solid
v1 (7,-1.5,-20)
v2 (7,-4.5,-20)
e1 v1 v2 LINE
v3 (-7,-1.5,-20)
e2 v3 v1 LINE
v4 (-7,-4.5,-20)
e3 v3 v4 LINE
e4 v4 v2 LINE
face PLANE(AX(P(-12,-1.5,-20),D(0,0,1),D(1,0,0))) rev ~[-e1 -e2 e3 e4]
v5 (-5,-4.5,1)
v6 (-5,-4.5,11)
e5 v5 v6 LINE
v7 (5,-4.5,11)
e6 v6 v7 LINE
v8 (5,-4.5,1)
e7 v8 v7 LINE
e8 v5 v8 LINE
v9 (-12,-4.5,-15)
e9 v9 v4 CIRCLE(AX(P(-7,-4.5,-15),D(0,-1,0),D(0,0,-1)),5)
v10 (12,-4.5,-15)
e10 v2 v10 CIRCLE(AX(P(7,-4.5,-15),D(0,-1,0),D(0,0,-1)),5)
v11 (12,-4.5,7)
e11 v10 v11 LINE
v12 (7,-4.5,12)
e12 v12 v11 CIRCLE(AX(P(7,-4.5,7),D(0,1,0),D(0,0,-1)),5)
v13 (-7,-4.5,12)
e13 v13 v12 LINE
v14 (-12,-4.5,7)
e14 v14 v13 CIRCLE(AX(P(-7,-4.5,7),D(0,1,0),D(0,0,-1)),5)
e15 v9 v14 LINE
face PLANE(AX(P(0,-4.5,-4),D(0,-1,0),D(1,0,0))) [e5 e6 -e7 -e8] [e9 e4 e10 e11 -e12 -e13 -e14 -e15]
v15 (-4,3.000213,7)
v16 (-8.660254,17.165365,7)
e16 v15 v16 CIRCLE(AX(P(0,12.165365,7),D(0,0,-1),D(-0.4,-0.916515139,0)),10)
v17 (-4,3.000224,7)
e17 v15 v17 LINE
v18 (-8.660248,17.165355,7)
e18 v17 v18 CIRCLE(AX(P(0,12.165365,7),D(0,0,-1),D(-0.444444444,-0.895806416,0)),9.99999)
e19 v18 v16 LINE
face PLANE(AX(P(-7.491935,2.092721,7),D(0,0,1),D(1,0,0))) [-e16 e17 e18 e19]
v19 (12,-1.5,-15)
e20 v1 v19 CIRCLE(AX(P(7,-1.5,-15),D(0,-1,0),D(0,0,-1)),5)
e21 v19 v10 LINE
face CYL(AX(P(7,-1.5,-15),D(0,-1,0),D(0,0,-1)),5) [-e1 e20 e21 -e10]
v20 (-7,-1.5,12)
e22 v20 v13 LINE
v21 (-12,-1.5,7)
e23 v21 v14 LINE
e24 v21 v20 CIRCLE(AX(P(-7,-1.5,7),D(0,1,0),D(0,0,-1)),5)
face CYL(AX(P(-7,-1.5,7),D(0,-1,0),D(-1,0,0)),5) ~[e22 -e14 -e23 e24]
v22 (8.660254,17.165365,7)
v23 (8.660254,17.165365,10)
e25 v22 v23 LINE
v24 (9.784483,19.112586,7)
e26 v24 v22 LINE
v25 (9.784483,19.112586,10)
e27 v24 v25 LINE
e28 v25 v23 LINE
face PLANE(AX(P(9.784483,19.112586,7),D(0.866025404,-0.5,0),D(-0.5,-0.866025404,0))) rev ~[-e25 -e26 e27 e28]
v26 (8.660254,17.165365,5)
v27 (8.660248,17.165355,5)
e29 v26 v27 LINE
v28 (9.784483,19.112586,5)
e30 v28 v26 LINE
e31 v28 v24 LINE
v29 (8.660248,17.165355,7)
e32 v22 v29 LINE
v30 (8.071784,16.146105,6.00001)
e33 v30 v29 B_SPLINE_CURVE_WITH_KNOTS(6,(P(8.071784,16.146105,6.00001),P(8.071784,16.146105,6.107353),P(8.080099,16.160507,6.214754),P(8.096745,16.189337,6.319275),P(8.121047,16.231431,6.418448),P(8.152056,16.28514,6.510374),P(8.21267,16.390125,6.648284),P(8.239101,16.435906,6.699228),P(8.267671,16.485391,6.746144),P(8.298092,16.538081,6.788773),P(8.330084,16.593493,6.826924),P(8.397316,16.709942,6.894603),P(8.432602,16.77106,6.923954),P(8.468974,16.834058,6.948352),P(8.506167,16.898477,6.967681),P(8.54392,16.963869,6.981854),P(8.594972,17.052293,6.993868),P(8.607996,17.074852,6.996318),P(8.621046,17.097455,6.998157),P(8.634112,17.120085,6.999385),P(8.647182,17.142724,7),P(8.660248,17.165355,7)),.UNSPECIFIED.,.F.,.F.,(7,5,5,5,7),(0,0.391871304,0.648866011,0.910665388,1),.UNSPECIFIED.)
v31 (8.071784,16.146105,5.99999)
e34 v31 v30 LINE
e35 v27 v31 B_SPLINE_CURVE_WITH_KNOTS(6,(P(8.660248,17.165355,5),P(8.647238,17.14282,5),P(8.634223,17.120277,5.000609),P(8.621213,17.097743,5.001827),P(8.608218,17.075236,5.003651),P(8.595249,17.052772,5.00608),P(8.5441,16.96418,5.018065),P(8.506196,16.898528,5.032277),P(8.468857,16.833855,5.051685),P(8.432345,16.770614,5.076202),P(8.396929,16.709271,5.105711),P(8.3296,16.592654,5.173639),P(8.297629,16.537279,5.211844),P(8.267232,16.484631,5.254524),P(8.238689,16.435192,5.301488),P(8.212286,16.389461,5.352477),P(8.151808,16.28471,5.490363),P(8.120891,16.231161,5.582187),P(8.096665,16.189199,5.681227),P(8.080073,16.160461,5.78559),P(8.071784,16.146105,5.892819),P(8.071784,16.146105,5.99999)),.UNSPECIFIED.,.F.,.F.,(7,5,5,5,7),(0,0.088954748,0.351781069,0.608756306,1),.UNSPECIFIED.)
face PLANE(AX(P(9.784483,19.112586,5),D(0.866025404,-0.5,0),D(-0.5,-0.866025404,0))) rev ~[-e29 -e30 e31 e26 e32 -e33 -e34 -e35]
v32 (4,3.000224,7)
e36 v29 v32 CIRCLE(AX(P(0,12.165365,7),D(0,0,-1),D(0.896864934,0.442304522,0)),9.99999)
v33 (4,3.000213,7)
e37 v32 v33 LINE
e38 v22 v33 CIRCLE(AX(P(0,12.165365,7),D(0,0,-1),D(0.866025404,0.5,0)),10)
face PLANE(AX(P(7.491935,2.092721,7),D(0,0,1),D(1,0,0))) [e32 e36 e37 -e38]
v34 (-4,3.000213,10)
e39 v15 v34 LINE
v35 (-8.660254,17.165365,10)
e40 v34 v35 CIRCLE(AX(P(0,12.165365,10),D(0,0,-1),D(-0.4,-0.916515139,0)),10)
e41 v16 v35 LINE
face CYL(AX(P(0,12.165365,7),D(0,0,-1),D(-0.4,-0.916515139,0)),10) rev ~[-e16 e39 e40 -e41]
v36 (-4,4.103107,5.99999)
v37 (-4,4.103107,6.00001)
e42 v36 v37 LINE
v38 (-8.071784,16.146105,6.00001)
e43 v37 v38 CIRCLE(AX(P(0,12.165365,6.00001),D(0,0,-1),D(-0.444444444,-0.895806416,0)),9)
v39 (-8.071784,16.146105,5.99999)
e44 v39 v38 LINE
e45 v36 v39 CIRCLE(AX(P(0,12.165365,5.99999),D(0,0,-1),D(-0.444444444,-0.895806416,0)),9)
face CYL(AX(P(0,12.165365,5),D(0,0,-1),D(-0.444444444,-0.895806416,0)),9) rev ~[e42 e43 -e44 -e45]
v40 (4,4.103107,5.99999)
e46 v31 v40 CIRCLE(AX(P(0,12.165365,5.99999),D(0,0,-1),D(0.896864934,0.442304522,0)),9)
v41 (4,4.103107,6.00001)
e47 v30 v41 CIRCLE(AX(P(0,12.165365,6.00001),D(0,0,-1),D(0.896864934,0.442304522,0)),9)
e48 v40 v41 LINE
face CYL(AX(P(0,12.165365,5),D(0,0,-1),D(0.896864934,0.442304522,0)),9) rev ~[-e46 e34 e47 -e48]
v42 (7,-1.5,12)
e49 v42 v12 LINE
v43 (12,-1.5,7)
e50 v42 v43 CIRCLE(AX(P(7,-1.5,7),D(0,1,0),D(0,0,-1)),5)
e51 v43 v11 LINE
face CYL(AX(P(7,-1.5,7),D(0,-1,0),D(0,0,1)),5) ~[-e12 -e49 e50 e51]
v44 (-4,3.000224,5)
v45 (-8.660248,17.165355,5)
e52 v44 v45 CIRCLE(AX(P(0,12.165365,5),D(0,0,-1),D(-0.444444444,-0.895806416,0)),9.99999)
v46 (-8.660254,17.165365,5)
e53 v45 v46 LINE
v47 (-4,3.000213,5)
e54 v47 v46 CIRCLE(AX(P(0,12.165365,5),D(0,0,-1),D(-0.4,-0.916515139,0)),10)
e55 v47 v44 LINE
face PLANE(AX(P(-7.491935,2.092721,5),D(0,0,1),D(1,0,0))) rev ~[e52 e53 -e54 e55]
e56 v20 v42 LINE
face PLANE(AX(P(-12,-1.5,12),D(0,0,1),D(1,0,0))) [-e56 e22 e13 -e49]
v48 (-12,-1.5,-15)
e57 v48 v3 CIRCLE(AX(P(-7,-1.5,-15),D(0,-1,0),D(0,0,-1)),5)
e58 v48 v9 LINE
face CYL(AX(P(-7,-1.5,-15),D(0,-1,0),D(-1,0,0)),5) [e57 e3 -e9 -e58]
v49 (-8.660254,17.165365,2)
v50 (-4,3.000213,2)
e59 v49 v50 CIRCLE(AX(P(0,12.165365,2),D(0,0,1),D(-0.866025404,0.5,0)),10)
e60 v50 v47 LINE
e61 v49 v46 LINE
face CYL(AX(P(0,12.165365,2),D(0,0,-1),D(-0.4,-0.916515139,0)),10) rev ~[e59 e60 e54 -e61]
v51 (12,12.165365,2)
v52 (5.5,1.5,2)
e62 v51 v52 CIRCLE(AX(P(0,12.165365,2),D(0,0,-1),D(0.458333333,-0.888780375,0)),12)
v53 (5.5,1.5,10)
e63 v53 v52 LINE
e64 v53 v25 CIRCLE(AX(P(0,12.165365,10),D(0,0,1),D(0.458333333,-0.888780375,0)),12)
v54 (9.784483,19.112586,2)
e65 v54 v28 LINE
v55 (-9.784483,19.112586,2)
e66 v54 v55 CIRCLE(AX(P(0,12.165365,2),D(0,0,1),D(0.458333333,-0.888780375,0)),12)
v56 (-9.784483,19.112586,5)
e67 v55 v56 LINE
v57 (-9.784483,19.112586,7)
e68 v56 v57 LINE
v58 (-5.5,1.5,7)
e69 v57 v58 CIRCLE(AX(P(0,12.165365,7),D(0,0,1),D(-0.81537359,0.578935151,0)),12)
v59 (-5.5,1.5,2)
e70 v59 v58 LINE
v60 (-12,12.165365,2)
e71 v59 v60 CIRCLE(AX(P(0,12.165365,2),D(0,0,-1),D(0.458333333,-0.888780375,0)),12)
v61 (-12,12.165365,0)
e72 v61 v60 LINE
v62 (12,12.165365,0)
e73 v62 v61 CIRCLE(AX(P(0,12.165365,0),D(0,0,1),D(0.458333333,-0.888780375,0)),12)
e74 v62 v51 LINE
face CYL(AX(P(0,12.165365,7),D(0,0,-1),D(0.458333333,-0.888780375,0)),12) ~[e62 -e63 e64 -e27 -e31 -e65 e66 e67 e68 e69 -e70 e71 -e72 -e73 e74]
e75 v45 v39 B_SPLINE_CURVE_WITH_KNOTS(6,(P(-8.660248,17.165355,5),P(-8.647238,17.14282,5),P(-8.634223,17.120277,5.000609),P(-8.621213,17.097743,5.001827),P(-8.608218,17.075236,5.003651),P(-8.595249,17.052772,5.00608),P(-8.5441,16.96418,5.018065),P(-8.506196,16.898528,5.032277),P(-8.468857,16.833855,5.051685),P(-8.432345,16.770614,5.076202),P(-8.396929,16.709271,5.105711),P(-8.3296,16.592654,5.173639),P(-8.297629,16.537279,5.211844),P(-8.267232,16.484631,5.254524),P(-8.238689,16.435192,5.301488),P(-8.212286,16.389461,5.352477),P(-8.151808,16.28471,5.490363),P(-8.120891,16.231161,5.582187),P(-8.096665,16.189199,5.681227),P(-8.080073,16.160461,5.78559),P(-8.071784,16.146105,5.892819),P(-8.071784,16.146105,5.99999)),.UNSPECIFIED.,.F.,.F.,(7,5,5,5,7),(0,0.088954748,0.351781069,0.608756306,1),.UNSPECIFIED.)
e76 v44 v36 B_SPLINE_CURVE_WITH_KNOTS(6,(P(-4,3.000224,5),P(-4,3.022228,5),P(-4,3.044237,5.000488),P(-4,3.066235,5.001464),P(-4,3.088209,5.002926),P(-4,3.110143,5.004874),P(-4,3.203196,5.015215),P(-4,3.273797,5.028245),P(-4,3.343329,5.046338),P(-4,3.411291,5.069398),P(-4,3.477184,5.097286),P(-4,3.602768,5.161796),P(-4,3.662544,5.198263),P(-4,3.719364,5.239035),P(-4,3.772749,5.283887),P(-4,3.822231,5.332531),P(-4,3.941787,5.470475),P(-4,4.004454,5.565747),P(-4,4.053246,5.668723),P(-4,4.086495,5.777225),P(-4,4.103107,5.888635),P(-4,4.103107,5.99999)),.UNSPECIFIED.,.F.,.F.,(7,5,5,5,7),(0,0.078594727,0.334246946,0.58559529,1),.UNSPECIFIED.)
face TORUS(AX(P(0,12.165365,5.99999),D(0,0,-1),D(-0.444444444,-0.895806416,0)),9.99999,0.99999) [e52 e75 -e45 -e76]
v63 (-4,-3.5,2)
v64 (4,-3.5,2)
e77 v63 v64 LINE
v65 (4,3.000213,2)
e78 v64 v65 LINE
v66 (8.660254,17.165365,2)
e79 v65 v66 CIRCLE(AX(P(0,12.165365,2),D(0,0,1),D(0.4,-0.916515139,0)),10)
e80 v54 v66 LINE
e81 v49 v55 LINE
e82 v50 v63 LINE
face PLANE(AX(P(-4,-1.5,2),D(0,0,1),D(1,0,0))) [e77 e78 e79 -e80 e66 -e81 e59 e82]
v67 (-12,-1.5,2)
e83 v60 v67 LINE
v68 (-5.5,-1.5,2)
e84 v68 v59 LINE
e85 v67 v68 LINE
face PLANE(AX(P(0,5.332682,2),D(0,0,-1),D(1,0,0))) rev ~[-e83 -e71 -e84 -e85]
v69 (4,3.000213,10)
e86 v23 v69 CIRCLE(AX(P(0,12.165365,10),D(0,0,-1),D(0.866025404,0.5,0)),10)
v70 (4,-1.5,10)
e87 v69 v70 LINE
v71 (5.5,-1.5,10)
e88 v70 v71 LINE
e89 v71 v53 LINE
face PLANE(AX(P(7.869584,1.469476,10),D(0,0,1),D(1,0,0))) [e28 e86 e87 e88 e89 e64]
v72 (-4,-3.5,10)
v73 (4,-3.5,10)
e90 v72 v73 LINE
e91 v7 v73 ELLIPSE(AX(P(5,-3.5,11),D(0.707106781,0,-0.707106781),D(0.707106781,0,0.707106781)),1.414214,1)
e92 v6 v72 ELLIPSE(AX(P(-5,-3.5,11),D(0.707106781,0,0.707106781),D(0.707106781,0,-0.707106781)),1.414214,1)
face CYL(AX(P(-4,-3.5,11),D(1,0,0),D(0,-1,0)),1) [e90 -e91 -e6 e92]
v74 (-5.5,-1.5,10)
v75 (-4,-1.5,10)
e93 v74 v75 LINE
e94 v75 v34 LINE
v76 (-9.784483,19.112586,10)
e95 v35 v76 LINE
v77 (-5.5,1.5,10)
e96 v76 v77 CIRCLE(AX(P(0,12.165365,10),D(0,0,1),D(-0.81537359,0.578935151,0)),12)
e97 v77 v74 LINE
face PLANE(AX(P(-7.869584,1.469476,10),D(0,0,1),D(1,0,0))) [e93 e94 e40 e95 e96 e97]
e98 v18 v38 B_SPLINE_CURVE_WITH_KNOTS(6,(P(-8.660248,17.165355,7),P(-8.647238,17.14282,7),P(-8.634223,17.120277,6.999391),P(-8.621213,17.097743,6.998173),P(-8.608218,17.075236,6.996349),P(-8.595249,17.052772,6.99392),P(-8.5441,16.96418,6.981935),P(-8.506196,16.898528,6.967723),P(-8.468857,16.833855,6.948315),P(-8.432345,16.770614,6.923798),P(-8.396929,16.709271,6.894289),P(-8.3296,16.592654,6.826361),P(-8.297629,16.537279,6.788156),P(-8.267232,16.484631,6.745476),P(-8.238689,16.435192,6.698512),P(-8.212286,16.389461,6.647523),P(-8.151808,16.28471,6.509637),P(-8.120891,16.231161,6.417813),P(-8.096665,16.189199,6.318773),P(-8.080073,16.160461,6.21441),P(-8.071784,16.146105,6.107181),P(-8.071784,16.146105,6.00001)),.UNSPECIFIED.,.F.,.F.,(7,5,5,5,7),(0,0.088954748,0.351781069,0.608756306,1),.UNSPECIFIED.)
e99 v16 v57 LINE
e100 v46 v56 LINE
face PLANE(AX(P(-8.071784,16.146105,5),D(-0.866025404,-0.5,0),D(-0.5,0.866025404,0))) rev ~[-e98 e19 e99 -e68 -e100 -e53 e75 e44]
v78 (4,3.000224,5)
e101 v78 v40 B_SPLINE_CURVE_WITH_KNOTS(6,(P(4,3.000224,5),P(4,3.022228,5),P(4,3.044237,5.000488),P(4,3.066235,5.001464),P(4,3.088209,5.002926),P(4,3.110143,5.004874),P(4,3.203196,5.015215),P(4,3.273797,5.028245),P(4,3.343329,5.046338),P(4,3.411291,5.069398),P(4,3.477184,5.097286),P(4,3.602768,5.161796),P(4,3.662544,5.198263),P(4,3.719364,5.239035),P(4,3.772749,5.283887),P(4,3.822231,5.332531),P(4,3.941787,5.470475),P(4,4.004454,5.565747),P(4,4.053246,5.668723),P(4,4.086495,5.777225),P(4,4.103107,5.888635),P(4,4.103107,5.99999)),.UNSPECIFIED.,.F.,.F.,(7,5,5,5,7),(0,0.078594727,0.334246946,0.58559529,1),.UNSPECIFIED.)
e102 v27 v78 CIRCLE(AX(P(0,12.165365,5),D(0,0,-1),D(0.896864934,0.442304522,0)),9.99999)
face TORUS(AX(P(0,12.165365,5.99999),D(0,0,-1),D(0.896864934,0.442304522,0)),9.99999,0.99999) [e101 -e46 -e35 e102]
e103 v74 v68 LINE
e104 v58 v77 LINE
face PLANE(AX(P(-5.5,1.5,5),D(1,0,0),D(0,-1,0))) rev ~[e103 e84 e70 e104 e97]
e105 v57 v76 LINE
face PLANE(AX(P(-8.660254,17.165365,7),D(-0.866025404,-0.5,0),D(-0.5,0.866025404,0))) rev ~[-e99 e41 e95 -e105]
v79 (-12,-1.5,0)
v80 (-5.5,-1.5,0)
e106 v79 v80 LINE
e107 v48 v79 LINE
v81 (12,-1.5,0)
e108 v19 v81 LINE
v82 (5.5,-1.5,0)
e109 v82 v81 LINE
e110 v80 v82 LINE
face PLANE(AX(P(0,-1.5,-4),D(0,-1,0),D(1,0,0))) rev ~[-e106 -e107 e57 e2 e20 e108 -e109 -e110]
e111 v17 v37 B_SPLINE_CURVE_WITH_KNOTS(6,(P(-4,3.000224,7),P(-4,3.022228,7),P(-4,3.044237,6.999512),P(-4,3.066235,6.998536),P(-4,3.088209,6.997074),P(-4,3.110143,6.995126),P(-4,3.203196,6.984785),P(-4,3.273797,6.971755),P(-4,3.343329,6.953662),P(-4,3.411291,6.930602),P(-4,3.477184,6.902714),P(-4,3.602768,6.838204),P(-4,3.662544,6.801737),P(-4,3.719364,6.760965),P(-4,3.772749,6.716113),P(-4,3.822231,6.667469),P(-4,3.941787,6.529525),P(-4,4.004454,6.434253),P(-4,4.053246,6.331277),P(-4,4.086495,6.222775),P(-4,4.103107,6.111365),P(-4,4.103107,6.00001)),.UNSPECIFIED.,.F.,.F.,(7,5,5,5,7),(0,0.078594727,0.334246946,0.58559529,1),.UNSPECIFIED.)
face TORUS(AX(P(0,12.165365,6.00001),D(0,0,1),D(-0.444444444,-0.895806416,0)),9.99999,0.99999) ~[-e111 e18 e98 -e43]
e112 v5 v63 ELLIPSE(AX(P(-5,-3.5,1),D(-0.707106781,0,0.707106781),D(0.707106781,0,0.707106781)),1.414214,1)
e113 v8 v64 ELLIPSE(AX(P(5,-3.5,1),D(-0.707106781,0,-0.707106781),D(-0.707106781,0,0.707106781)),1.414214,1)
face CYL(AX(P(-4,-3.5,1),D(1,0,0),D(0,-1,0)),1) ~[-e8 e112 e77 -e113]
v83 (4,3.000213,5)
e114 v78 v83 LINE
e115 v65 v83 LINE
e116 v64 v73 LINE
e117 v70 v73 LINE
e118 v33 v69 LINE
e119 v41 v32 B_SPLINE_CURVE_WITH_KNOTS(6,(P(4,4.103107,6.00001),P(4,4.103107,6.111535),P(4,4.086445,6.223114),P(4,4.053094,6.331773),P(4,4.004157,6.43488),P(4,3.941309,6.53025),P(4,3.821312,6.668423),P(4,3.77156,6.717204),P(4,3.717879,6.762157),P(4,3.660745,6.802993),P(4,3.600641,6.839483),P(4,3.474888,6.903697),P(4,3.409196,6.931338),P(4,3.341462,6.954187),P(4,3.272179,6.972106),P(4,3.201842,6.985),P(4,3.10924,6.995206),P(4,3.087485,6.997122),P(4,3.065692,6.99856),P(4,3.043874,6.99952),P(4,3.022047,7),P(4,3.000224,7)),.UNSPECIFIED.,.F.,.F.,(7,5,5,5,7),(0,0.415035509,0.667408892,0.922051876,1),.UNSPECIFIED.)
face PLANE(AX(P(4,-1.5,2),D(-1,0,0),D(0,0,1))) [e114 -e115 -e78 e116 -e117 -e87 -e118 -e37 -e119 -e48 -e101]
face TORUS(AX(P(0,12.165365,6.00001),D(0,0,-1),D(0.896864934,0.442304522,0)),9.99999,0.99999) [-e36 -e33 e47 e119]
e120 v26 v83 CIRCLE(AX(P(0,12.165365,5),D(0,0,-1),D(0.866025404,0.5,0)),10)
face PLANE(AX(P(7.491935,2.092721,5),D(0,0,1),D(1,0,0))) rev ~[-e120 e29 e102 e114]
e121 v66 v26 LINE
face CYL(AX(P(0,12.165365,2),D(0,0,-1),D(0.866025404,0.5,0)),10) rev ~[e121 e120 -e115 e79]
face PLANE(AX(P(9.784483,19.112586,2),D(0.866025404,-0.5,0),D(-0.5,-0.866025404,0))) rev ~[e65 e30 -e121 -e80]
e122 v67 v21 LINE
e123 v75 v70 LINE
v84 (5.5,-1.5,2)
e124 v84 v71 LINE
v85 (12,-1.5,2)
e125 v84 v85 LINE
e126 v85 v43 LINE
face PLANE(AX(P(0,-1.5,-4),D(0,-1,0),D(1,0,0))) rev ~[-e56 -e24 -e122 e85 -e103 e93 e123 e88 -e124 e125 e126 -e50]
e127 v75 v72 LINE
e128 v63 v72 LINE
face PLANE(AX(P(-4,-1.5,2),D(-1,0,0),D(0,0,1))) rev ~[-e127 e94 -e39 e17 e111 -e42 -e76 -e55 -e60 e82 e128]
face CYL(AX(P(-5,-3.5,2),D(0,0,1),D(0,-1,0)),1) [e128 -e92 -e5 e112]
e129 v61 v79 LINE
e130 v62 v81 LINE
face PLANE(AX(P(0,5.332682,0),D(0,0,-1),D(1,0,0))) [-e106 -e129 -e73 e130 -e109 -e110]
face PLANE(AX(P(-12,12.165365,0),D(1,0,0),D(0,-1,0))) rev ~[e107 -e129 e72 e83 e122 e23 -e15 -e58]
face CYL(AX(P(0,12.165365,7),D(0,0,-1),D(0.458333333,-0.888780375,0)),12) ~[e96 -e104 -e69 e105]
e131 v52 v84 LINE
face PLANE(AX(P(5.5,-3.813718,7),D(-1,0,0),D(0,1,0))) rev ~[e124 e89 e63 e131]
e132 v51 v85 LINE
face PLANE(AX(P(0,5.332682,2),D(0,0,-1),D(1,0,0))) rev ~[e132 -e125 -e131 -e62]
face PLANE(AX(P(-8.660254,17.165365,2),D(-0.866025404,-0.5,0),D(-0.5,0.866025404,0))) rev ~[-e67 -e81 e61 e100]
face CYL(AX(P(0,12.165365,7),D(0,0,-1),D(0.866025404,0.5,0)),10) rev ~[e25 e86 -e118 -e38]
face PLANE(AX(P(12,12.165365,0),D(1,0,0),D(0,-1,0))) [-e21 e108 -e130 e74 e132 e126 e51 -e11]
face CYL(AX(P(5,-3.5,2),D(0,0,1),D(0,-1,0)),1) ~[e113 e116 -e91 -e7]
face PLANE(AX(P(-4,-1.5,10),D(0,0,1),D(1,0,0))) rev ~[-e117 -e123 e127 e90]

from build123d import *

# Parameters (mm, degrees)
F1_DEPTH  = 2
F3_DEPTH  = 3
F5_DEPTH  = 2
F7_DEPTH  = 3
F8_R      = 0.99999
F9_W      = 24
F9_H      = 22.6653645039
F10_DEPTH = 10
F11_W     = 24
F11_H     = 32
F11_W_2   = 8
F11_H_2   = 8
F12_DEPTH = 3
F13_R     = 1
F14_R     = 5
F15_W     = 24
F15_H     = 13.6653645039
F16_DEPTH = 2


# Not quite as in the source:
# - a fillet or chamfer is up to 0.001 mm smaller than in the source, because OpenCascade refuses the exact size


with BuildPart() as f1:
    # F0 (on Top) → F1 (new body)
    with BuildSketch(Plane.XY):
        with BuildLine():
            ThreePointArc((5.5, 1.5), (0, 24.1653645039), (-5.5, 1.5))
            Line((-5.5, 1.5), (-5.5, -1.5))
            ThreePointArc((-5.5, -1.5), (0, -24.1653645039), (5.5, -1.5))
            Line((5.5, -1.5), (5.5, 1.5))
        make_face()
    extrude(amount=F1_DEPTH)

    # F2 (on face) → F3 (join)
    with BuildSketch(Plane.XY.offset(2)):
        with BuildLine():
            Line((9.7844830762, 19.1125863177), (8.6602540378, 17.1653645039))
            ThreePointArc((8.6602540378, 17.1653645039), (9.4991255677, 9.0402063559), (4, 3.0002131139))
            Line((4, 3.0002131139), (4, -6.2432010007))
            Line((4, -6.2432010007), (9.1651513899, -16.1653645039))
            ThreePointArc((9.1651513899, -16.1653645039), (9.5868378212, -9.3206253964), (5.5, -3.8137179596))
            Line((5.5, -3.8137179596), (5.5, 1.5))
            ThreePointArc((5.5, 1.5), (11.6599594736, 9.3289327537), (9.7844830762, 19.1125863177))
        make_face()
        with BuildLine():
            ThreePointArc((-4, 3.0002131139), (-9.4991255677, 9.0402063559), (-8.6602540378, 17.1653645039))
            Line((-8.6602540378, 17.1653645039), (-9.7844830762, 19.1125863177))
            ThreePointArc((-9.7844830762, 19.1125863177), (-11.6599594736, 9.3289327537), (-5.5, 1.5))
            Line((-5.5, 1.5), (-5.5, -3.8137179596))
            ThreePointArc((-5.5, -3.8137179596), (-9.5868378212, -9.3206253964), (-9.1651513899, -16.1653645039))
            Line((-9.1651513899, -16.1653645039), (-4, -6.2432010007))
            Line((-4, -6.2432010007), (-4, 3.0002131139))
        make_face()
    extrude(amount=F3_DEPTH)

    # F4 (on face) → F5 (join)
    with BuildSketch(Plane.XY.offset(5)):
        with BuildLine():
            Line((-8.0717844057, 16.1461052023), (-9.7844830762, 19.1125863177))
            ThreePointArc((-9.7844830762, 19.1125863177), (-11.6599594736, 9.3289327537), (-5.5, 1.5))
            Line((-5.5, 1.5), (-5.5, -5.0414610795))
            ThreePointArc((-5.5, -5.0414610795), (-8.6043935433, -9.5263473097), (-8.5483759414, -14.980549891))
            Line((-8.5483759414, -14.980549891), (-4, -6.2432010007))
            Line((-4, -6.2432010007), (-4, 4.1031067556))
            ThreePointArc((-4, 4.1031067556), (-8.5258693153, 9.2827350759), (-8.0717844057, 16.1461052023))
        make_face()
        with BuildLine():
            ThreePointArc((5.5, 1.5), (11.6599594736, 9.3289327537), (9.7844830762, 19.1125863177))
            Line((9.7844830762, 19.1125863177), (8.0717844057, 16.1461052023))
            ThreePointArc((8.0717844057, 16.1461052023), (8.5258693153, 9.2827350759), (4, 4.1031067556))
            Line((4, 4.1031067556), (4, -6.2432010007))
            Line((4, -6.2432010007), (8.5483759414, -14.980549891))
            ThreePointArc((8.5483759414, -14.980549891), (8.6043935433, -9.5263473097), (5.5, -5.0414610795))
            Line((5.5, -5.0414610795), (5.5, 1.5))
        make_face()
    extrude(amount=F5_DEPTH)

    # F6 (on face) → F7 (join)
    with BuildSketch(Plane.XY.offset(7)):
        with BuildLine():
            Line((9.7844830762, 19.1125863177), (8.6602540378, 17.1653645039))
            ThreePointArc((8.6602540378, 17.1653645039), (9.4991255677, 9.0402063559), (4, 3.0002131139))
            Line((4, 3.0002131139), (4, -6.2432010007))
            Line((4, -6.2432010007), (9.1651513899, -16.1653645039))
            ThreePointArc((9.1651513899, -16.1653645039), (9.5868378212, -9.3206253964), (5.5, -3.8137179596))
            Line((5.5, -3.8137179596), (5.5, 1.5))
            ThreePointArc((5.5, 1.5), (11.6599594736, 9.3289327537), (9.7844830762, 19.1125863177))
        make_face()
        with BuildLine():
            ThreePointArc((-4, 3.0002131139), (-9.4991255677, 9.0402063559), (-8.6602540378, 17.1653645039))
            Line((-8.6602540378, 17.1653645039), (-9.7844830762, 19.1125863177))
            ThreePointArc((-9.7844830762, 19.1125863177), (-11.6599594736, 9.3289327537), (-5.5, 1.5))
            Line((-5.5, 1.5), (-5.5, -3.8137179596))
            ThreePointArc((-5.5, -3.8137179596), (-9.5868378212, -9.3206253964), (-9.1651513899, -16.1653645039))
            Line((-9.1651513899, -16.1653645039), (-4, -6.2432010007))
            Line((-4, -6.2432010007), (-4, 3.0002131139))
        make_face()
    extrude(amount=F7_DEPTH)

    # F8 (radius 1 in the source; OpenCascade refuses exactly that, so slightly less here)
    f8_edges = [f1.edges().sort_by_distance(p)[0] for p in [
        (8.525869, 9.282735, 7),
        (-8.525869, 9.282735, 7),
        (-8.525869, 9.282735, 5),
        (8.525869, 9.282735, 5),
        (-8.604394, -9.526347, 5),
        (-8.604394, -9.526347, 7),
        (8.604394, -9.526347, 7),
        (8.604394, -9.526347, 5),
    ]]
    fillet(f8_edges, radius=F8_R)

    # F9 (on face) → F10 (cut)
    with BuildSketch(Plane.XY.offset(10)):
        with Locations((0, -12.8326822519)):
            Rectangle(F9_W, F9_H)
    extrude(amount=-F10_DEPTH, mode=Mode.SUBTRACT)

    # F11 (on face) → F12 (join)
    with BuildSketch(Plane.XZ.offset(1.5)):
        with Locations((0, -4)):
            Rectangle(F11_W, F11_H)
        with Locations((0, 6)):
            Rectangle(F11_W_2, F11_H_2, mode=Mode.SUBTRACT)
    extrude(amount=F12_DEPTH)

    # F13
    f13_edges = [f1.edges().sort_by_distance(p)[0] for p in [
        (0, -4.5, 10),
        (4, -4.5, 6),
        (-4, -4.5, 6),
        (0, -4.5, 2),
    ]]
    fillet(f13_edges, radius=F13_R)

    # F14
    f14_edges = [f1.edges().sort_by_distance(p)[0] for p in [
        (-12, -3, 12),
        (12, -3, 12),
        (12, -3, -20),
        (-12, -3, -20),
    ]]
    fillet(f14_edges, radius=F14_R)

    # F15 (on face) → F16 (join)
    with BuildSketch(Plane(origin=(0, 0, 0), x_dir=(1, 0, 0), z_dir=(0, 0, -1))):
        with Locations((0, -5.3326822519)):
            Rectangle(F15_W, F15_H)
    extrude(amount=-F16_DEPTH)


solid = f1.part
